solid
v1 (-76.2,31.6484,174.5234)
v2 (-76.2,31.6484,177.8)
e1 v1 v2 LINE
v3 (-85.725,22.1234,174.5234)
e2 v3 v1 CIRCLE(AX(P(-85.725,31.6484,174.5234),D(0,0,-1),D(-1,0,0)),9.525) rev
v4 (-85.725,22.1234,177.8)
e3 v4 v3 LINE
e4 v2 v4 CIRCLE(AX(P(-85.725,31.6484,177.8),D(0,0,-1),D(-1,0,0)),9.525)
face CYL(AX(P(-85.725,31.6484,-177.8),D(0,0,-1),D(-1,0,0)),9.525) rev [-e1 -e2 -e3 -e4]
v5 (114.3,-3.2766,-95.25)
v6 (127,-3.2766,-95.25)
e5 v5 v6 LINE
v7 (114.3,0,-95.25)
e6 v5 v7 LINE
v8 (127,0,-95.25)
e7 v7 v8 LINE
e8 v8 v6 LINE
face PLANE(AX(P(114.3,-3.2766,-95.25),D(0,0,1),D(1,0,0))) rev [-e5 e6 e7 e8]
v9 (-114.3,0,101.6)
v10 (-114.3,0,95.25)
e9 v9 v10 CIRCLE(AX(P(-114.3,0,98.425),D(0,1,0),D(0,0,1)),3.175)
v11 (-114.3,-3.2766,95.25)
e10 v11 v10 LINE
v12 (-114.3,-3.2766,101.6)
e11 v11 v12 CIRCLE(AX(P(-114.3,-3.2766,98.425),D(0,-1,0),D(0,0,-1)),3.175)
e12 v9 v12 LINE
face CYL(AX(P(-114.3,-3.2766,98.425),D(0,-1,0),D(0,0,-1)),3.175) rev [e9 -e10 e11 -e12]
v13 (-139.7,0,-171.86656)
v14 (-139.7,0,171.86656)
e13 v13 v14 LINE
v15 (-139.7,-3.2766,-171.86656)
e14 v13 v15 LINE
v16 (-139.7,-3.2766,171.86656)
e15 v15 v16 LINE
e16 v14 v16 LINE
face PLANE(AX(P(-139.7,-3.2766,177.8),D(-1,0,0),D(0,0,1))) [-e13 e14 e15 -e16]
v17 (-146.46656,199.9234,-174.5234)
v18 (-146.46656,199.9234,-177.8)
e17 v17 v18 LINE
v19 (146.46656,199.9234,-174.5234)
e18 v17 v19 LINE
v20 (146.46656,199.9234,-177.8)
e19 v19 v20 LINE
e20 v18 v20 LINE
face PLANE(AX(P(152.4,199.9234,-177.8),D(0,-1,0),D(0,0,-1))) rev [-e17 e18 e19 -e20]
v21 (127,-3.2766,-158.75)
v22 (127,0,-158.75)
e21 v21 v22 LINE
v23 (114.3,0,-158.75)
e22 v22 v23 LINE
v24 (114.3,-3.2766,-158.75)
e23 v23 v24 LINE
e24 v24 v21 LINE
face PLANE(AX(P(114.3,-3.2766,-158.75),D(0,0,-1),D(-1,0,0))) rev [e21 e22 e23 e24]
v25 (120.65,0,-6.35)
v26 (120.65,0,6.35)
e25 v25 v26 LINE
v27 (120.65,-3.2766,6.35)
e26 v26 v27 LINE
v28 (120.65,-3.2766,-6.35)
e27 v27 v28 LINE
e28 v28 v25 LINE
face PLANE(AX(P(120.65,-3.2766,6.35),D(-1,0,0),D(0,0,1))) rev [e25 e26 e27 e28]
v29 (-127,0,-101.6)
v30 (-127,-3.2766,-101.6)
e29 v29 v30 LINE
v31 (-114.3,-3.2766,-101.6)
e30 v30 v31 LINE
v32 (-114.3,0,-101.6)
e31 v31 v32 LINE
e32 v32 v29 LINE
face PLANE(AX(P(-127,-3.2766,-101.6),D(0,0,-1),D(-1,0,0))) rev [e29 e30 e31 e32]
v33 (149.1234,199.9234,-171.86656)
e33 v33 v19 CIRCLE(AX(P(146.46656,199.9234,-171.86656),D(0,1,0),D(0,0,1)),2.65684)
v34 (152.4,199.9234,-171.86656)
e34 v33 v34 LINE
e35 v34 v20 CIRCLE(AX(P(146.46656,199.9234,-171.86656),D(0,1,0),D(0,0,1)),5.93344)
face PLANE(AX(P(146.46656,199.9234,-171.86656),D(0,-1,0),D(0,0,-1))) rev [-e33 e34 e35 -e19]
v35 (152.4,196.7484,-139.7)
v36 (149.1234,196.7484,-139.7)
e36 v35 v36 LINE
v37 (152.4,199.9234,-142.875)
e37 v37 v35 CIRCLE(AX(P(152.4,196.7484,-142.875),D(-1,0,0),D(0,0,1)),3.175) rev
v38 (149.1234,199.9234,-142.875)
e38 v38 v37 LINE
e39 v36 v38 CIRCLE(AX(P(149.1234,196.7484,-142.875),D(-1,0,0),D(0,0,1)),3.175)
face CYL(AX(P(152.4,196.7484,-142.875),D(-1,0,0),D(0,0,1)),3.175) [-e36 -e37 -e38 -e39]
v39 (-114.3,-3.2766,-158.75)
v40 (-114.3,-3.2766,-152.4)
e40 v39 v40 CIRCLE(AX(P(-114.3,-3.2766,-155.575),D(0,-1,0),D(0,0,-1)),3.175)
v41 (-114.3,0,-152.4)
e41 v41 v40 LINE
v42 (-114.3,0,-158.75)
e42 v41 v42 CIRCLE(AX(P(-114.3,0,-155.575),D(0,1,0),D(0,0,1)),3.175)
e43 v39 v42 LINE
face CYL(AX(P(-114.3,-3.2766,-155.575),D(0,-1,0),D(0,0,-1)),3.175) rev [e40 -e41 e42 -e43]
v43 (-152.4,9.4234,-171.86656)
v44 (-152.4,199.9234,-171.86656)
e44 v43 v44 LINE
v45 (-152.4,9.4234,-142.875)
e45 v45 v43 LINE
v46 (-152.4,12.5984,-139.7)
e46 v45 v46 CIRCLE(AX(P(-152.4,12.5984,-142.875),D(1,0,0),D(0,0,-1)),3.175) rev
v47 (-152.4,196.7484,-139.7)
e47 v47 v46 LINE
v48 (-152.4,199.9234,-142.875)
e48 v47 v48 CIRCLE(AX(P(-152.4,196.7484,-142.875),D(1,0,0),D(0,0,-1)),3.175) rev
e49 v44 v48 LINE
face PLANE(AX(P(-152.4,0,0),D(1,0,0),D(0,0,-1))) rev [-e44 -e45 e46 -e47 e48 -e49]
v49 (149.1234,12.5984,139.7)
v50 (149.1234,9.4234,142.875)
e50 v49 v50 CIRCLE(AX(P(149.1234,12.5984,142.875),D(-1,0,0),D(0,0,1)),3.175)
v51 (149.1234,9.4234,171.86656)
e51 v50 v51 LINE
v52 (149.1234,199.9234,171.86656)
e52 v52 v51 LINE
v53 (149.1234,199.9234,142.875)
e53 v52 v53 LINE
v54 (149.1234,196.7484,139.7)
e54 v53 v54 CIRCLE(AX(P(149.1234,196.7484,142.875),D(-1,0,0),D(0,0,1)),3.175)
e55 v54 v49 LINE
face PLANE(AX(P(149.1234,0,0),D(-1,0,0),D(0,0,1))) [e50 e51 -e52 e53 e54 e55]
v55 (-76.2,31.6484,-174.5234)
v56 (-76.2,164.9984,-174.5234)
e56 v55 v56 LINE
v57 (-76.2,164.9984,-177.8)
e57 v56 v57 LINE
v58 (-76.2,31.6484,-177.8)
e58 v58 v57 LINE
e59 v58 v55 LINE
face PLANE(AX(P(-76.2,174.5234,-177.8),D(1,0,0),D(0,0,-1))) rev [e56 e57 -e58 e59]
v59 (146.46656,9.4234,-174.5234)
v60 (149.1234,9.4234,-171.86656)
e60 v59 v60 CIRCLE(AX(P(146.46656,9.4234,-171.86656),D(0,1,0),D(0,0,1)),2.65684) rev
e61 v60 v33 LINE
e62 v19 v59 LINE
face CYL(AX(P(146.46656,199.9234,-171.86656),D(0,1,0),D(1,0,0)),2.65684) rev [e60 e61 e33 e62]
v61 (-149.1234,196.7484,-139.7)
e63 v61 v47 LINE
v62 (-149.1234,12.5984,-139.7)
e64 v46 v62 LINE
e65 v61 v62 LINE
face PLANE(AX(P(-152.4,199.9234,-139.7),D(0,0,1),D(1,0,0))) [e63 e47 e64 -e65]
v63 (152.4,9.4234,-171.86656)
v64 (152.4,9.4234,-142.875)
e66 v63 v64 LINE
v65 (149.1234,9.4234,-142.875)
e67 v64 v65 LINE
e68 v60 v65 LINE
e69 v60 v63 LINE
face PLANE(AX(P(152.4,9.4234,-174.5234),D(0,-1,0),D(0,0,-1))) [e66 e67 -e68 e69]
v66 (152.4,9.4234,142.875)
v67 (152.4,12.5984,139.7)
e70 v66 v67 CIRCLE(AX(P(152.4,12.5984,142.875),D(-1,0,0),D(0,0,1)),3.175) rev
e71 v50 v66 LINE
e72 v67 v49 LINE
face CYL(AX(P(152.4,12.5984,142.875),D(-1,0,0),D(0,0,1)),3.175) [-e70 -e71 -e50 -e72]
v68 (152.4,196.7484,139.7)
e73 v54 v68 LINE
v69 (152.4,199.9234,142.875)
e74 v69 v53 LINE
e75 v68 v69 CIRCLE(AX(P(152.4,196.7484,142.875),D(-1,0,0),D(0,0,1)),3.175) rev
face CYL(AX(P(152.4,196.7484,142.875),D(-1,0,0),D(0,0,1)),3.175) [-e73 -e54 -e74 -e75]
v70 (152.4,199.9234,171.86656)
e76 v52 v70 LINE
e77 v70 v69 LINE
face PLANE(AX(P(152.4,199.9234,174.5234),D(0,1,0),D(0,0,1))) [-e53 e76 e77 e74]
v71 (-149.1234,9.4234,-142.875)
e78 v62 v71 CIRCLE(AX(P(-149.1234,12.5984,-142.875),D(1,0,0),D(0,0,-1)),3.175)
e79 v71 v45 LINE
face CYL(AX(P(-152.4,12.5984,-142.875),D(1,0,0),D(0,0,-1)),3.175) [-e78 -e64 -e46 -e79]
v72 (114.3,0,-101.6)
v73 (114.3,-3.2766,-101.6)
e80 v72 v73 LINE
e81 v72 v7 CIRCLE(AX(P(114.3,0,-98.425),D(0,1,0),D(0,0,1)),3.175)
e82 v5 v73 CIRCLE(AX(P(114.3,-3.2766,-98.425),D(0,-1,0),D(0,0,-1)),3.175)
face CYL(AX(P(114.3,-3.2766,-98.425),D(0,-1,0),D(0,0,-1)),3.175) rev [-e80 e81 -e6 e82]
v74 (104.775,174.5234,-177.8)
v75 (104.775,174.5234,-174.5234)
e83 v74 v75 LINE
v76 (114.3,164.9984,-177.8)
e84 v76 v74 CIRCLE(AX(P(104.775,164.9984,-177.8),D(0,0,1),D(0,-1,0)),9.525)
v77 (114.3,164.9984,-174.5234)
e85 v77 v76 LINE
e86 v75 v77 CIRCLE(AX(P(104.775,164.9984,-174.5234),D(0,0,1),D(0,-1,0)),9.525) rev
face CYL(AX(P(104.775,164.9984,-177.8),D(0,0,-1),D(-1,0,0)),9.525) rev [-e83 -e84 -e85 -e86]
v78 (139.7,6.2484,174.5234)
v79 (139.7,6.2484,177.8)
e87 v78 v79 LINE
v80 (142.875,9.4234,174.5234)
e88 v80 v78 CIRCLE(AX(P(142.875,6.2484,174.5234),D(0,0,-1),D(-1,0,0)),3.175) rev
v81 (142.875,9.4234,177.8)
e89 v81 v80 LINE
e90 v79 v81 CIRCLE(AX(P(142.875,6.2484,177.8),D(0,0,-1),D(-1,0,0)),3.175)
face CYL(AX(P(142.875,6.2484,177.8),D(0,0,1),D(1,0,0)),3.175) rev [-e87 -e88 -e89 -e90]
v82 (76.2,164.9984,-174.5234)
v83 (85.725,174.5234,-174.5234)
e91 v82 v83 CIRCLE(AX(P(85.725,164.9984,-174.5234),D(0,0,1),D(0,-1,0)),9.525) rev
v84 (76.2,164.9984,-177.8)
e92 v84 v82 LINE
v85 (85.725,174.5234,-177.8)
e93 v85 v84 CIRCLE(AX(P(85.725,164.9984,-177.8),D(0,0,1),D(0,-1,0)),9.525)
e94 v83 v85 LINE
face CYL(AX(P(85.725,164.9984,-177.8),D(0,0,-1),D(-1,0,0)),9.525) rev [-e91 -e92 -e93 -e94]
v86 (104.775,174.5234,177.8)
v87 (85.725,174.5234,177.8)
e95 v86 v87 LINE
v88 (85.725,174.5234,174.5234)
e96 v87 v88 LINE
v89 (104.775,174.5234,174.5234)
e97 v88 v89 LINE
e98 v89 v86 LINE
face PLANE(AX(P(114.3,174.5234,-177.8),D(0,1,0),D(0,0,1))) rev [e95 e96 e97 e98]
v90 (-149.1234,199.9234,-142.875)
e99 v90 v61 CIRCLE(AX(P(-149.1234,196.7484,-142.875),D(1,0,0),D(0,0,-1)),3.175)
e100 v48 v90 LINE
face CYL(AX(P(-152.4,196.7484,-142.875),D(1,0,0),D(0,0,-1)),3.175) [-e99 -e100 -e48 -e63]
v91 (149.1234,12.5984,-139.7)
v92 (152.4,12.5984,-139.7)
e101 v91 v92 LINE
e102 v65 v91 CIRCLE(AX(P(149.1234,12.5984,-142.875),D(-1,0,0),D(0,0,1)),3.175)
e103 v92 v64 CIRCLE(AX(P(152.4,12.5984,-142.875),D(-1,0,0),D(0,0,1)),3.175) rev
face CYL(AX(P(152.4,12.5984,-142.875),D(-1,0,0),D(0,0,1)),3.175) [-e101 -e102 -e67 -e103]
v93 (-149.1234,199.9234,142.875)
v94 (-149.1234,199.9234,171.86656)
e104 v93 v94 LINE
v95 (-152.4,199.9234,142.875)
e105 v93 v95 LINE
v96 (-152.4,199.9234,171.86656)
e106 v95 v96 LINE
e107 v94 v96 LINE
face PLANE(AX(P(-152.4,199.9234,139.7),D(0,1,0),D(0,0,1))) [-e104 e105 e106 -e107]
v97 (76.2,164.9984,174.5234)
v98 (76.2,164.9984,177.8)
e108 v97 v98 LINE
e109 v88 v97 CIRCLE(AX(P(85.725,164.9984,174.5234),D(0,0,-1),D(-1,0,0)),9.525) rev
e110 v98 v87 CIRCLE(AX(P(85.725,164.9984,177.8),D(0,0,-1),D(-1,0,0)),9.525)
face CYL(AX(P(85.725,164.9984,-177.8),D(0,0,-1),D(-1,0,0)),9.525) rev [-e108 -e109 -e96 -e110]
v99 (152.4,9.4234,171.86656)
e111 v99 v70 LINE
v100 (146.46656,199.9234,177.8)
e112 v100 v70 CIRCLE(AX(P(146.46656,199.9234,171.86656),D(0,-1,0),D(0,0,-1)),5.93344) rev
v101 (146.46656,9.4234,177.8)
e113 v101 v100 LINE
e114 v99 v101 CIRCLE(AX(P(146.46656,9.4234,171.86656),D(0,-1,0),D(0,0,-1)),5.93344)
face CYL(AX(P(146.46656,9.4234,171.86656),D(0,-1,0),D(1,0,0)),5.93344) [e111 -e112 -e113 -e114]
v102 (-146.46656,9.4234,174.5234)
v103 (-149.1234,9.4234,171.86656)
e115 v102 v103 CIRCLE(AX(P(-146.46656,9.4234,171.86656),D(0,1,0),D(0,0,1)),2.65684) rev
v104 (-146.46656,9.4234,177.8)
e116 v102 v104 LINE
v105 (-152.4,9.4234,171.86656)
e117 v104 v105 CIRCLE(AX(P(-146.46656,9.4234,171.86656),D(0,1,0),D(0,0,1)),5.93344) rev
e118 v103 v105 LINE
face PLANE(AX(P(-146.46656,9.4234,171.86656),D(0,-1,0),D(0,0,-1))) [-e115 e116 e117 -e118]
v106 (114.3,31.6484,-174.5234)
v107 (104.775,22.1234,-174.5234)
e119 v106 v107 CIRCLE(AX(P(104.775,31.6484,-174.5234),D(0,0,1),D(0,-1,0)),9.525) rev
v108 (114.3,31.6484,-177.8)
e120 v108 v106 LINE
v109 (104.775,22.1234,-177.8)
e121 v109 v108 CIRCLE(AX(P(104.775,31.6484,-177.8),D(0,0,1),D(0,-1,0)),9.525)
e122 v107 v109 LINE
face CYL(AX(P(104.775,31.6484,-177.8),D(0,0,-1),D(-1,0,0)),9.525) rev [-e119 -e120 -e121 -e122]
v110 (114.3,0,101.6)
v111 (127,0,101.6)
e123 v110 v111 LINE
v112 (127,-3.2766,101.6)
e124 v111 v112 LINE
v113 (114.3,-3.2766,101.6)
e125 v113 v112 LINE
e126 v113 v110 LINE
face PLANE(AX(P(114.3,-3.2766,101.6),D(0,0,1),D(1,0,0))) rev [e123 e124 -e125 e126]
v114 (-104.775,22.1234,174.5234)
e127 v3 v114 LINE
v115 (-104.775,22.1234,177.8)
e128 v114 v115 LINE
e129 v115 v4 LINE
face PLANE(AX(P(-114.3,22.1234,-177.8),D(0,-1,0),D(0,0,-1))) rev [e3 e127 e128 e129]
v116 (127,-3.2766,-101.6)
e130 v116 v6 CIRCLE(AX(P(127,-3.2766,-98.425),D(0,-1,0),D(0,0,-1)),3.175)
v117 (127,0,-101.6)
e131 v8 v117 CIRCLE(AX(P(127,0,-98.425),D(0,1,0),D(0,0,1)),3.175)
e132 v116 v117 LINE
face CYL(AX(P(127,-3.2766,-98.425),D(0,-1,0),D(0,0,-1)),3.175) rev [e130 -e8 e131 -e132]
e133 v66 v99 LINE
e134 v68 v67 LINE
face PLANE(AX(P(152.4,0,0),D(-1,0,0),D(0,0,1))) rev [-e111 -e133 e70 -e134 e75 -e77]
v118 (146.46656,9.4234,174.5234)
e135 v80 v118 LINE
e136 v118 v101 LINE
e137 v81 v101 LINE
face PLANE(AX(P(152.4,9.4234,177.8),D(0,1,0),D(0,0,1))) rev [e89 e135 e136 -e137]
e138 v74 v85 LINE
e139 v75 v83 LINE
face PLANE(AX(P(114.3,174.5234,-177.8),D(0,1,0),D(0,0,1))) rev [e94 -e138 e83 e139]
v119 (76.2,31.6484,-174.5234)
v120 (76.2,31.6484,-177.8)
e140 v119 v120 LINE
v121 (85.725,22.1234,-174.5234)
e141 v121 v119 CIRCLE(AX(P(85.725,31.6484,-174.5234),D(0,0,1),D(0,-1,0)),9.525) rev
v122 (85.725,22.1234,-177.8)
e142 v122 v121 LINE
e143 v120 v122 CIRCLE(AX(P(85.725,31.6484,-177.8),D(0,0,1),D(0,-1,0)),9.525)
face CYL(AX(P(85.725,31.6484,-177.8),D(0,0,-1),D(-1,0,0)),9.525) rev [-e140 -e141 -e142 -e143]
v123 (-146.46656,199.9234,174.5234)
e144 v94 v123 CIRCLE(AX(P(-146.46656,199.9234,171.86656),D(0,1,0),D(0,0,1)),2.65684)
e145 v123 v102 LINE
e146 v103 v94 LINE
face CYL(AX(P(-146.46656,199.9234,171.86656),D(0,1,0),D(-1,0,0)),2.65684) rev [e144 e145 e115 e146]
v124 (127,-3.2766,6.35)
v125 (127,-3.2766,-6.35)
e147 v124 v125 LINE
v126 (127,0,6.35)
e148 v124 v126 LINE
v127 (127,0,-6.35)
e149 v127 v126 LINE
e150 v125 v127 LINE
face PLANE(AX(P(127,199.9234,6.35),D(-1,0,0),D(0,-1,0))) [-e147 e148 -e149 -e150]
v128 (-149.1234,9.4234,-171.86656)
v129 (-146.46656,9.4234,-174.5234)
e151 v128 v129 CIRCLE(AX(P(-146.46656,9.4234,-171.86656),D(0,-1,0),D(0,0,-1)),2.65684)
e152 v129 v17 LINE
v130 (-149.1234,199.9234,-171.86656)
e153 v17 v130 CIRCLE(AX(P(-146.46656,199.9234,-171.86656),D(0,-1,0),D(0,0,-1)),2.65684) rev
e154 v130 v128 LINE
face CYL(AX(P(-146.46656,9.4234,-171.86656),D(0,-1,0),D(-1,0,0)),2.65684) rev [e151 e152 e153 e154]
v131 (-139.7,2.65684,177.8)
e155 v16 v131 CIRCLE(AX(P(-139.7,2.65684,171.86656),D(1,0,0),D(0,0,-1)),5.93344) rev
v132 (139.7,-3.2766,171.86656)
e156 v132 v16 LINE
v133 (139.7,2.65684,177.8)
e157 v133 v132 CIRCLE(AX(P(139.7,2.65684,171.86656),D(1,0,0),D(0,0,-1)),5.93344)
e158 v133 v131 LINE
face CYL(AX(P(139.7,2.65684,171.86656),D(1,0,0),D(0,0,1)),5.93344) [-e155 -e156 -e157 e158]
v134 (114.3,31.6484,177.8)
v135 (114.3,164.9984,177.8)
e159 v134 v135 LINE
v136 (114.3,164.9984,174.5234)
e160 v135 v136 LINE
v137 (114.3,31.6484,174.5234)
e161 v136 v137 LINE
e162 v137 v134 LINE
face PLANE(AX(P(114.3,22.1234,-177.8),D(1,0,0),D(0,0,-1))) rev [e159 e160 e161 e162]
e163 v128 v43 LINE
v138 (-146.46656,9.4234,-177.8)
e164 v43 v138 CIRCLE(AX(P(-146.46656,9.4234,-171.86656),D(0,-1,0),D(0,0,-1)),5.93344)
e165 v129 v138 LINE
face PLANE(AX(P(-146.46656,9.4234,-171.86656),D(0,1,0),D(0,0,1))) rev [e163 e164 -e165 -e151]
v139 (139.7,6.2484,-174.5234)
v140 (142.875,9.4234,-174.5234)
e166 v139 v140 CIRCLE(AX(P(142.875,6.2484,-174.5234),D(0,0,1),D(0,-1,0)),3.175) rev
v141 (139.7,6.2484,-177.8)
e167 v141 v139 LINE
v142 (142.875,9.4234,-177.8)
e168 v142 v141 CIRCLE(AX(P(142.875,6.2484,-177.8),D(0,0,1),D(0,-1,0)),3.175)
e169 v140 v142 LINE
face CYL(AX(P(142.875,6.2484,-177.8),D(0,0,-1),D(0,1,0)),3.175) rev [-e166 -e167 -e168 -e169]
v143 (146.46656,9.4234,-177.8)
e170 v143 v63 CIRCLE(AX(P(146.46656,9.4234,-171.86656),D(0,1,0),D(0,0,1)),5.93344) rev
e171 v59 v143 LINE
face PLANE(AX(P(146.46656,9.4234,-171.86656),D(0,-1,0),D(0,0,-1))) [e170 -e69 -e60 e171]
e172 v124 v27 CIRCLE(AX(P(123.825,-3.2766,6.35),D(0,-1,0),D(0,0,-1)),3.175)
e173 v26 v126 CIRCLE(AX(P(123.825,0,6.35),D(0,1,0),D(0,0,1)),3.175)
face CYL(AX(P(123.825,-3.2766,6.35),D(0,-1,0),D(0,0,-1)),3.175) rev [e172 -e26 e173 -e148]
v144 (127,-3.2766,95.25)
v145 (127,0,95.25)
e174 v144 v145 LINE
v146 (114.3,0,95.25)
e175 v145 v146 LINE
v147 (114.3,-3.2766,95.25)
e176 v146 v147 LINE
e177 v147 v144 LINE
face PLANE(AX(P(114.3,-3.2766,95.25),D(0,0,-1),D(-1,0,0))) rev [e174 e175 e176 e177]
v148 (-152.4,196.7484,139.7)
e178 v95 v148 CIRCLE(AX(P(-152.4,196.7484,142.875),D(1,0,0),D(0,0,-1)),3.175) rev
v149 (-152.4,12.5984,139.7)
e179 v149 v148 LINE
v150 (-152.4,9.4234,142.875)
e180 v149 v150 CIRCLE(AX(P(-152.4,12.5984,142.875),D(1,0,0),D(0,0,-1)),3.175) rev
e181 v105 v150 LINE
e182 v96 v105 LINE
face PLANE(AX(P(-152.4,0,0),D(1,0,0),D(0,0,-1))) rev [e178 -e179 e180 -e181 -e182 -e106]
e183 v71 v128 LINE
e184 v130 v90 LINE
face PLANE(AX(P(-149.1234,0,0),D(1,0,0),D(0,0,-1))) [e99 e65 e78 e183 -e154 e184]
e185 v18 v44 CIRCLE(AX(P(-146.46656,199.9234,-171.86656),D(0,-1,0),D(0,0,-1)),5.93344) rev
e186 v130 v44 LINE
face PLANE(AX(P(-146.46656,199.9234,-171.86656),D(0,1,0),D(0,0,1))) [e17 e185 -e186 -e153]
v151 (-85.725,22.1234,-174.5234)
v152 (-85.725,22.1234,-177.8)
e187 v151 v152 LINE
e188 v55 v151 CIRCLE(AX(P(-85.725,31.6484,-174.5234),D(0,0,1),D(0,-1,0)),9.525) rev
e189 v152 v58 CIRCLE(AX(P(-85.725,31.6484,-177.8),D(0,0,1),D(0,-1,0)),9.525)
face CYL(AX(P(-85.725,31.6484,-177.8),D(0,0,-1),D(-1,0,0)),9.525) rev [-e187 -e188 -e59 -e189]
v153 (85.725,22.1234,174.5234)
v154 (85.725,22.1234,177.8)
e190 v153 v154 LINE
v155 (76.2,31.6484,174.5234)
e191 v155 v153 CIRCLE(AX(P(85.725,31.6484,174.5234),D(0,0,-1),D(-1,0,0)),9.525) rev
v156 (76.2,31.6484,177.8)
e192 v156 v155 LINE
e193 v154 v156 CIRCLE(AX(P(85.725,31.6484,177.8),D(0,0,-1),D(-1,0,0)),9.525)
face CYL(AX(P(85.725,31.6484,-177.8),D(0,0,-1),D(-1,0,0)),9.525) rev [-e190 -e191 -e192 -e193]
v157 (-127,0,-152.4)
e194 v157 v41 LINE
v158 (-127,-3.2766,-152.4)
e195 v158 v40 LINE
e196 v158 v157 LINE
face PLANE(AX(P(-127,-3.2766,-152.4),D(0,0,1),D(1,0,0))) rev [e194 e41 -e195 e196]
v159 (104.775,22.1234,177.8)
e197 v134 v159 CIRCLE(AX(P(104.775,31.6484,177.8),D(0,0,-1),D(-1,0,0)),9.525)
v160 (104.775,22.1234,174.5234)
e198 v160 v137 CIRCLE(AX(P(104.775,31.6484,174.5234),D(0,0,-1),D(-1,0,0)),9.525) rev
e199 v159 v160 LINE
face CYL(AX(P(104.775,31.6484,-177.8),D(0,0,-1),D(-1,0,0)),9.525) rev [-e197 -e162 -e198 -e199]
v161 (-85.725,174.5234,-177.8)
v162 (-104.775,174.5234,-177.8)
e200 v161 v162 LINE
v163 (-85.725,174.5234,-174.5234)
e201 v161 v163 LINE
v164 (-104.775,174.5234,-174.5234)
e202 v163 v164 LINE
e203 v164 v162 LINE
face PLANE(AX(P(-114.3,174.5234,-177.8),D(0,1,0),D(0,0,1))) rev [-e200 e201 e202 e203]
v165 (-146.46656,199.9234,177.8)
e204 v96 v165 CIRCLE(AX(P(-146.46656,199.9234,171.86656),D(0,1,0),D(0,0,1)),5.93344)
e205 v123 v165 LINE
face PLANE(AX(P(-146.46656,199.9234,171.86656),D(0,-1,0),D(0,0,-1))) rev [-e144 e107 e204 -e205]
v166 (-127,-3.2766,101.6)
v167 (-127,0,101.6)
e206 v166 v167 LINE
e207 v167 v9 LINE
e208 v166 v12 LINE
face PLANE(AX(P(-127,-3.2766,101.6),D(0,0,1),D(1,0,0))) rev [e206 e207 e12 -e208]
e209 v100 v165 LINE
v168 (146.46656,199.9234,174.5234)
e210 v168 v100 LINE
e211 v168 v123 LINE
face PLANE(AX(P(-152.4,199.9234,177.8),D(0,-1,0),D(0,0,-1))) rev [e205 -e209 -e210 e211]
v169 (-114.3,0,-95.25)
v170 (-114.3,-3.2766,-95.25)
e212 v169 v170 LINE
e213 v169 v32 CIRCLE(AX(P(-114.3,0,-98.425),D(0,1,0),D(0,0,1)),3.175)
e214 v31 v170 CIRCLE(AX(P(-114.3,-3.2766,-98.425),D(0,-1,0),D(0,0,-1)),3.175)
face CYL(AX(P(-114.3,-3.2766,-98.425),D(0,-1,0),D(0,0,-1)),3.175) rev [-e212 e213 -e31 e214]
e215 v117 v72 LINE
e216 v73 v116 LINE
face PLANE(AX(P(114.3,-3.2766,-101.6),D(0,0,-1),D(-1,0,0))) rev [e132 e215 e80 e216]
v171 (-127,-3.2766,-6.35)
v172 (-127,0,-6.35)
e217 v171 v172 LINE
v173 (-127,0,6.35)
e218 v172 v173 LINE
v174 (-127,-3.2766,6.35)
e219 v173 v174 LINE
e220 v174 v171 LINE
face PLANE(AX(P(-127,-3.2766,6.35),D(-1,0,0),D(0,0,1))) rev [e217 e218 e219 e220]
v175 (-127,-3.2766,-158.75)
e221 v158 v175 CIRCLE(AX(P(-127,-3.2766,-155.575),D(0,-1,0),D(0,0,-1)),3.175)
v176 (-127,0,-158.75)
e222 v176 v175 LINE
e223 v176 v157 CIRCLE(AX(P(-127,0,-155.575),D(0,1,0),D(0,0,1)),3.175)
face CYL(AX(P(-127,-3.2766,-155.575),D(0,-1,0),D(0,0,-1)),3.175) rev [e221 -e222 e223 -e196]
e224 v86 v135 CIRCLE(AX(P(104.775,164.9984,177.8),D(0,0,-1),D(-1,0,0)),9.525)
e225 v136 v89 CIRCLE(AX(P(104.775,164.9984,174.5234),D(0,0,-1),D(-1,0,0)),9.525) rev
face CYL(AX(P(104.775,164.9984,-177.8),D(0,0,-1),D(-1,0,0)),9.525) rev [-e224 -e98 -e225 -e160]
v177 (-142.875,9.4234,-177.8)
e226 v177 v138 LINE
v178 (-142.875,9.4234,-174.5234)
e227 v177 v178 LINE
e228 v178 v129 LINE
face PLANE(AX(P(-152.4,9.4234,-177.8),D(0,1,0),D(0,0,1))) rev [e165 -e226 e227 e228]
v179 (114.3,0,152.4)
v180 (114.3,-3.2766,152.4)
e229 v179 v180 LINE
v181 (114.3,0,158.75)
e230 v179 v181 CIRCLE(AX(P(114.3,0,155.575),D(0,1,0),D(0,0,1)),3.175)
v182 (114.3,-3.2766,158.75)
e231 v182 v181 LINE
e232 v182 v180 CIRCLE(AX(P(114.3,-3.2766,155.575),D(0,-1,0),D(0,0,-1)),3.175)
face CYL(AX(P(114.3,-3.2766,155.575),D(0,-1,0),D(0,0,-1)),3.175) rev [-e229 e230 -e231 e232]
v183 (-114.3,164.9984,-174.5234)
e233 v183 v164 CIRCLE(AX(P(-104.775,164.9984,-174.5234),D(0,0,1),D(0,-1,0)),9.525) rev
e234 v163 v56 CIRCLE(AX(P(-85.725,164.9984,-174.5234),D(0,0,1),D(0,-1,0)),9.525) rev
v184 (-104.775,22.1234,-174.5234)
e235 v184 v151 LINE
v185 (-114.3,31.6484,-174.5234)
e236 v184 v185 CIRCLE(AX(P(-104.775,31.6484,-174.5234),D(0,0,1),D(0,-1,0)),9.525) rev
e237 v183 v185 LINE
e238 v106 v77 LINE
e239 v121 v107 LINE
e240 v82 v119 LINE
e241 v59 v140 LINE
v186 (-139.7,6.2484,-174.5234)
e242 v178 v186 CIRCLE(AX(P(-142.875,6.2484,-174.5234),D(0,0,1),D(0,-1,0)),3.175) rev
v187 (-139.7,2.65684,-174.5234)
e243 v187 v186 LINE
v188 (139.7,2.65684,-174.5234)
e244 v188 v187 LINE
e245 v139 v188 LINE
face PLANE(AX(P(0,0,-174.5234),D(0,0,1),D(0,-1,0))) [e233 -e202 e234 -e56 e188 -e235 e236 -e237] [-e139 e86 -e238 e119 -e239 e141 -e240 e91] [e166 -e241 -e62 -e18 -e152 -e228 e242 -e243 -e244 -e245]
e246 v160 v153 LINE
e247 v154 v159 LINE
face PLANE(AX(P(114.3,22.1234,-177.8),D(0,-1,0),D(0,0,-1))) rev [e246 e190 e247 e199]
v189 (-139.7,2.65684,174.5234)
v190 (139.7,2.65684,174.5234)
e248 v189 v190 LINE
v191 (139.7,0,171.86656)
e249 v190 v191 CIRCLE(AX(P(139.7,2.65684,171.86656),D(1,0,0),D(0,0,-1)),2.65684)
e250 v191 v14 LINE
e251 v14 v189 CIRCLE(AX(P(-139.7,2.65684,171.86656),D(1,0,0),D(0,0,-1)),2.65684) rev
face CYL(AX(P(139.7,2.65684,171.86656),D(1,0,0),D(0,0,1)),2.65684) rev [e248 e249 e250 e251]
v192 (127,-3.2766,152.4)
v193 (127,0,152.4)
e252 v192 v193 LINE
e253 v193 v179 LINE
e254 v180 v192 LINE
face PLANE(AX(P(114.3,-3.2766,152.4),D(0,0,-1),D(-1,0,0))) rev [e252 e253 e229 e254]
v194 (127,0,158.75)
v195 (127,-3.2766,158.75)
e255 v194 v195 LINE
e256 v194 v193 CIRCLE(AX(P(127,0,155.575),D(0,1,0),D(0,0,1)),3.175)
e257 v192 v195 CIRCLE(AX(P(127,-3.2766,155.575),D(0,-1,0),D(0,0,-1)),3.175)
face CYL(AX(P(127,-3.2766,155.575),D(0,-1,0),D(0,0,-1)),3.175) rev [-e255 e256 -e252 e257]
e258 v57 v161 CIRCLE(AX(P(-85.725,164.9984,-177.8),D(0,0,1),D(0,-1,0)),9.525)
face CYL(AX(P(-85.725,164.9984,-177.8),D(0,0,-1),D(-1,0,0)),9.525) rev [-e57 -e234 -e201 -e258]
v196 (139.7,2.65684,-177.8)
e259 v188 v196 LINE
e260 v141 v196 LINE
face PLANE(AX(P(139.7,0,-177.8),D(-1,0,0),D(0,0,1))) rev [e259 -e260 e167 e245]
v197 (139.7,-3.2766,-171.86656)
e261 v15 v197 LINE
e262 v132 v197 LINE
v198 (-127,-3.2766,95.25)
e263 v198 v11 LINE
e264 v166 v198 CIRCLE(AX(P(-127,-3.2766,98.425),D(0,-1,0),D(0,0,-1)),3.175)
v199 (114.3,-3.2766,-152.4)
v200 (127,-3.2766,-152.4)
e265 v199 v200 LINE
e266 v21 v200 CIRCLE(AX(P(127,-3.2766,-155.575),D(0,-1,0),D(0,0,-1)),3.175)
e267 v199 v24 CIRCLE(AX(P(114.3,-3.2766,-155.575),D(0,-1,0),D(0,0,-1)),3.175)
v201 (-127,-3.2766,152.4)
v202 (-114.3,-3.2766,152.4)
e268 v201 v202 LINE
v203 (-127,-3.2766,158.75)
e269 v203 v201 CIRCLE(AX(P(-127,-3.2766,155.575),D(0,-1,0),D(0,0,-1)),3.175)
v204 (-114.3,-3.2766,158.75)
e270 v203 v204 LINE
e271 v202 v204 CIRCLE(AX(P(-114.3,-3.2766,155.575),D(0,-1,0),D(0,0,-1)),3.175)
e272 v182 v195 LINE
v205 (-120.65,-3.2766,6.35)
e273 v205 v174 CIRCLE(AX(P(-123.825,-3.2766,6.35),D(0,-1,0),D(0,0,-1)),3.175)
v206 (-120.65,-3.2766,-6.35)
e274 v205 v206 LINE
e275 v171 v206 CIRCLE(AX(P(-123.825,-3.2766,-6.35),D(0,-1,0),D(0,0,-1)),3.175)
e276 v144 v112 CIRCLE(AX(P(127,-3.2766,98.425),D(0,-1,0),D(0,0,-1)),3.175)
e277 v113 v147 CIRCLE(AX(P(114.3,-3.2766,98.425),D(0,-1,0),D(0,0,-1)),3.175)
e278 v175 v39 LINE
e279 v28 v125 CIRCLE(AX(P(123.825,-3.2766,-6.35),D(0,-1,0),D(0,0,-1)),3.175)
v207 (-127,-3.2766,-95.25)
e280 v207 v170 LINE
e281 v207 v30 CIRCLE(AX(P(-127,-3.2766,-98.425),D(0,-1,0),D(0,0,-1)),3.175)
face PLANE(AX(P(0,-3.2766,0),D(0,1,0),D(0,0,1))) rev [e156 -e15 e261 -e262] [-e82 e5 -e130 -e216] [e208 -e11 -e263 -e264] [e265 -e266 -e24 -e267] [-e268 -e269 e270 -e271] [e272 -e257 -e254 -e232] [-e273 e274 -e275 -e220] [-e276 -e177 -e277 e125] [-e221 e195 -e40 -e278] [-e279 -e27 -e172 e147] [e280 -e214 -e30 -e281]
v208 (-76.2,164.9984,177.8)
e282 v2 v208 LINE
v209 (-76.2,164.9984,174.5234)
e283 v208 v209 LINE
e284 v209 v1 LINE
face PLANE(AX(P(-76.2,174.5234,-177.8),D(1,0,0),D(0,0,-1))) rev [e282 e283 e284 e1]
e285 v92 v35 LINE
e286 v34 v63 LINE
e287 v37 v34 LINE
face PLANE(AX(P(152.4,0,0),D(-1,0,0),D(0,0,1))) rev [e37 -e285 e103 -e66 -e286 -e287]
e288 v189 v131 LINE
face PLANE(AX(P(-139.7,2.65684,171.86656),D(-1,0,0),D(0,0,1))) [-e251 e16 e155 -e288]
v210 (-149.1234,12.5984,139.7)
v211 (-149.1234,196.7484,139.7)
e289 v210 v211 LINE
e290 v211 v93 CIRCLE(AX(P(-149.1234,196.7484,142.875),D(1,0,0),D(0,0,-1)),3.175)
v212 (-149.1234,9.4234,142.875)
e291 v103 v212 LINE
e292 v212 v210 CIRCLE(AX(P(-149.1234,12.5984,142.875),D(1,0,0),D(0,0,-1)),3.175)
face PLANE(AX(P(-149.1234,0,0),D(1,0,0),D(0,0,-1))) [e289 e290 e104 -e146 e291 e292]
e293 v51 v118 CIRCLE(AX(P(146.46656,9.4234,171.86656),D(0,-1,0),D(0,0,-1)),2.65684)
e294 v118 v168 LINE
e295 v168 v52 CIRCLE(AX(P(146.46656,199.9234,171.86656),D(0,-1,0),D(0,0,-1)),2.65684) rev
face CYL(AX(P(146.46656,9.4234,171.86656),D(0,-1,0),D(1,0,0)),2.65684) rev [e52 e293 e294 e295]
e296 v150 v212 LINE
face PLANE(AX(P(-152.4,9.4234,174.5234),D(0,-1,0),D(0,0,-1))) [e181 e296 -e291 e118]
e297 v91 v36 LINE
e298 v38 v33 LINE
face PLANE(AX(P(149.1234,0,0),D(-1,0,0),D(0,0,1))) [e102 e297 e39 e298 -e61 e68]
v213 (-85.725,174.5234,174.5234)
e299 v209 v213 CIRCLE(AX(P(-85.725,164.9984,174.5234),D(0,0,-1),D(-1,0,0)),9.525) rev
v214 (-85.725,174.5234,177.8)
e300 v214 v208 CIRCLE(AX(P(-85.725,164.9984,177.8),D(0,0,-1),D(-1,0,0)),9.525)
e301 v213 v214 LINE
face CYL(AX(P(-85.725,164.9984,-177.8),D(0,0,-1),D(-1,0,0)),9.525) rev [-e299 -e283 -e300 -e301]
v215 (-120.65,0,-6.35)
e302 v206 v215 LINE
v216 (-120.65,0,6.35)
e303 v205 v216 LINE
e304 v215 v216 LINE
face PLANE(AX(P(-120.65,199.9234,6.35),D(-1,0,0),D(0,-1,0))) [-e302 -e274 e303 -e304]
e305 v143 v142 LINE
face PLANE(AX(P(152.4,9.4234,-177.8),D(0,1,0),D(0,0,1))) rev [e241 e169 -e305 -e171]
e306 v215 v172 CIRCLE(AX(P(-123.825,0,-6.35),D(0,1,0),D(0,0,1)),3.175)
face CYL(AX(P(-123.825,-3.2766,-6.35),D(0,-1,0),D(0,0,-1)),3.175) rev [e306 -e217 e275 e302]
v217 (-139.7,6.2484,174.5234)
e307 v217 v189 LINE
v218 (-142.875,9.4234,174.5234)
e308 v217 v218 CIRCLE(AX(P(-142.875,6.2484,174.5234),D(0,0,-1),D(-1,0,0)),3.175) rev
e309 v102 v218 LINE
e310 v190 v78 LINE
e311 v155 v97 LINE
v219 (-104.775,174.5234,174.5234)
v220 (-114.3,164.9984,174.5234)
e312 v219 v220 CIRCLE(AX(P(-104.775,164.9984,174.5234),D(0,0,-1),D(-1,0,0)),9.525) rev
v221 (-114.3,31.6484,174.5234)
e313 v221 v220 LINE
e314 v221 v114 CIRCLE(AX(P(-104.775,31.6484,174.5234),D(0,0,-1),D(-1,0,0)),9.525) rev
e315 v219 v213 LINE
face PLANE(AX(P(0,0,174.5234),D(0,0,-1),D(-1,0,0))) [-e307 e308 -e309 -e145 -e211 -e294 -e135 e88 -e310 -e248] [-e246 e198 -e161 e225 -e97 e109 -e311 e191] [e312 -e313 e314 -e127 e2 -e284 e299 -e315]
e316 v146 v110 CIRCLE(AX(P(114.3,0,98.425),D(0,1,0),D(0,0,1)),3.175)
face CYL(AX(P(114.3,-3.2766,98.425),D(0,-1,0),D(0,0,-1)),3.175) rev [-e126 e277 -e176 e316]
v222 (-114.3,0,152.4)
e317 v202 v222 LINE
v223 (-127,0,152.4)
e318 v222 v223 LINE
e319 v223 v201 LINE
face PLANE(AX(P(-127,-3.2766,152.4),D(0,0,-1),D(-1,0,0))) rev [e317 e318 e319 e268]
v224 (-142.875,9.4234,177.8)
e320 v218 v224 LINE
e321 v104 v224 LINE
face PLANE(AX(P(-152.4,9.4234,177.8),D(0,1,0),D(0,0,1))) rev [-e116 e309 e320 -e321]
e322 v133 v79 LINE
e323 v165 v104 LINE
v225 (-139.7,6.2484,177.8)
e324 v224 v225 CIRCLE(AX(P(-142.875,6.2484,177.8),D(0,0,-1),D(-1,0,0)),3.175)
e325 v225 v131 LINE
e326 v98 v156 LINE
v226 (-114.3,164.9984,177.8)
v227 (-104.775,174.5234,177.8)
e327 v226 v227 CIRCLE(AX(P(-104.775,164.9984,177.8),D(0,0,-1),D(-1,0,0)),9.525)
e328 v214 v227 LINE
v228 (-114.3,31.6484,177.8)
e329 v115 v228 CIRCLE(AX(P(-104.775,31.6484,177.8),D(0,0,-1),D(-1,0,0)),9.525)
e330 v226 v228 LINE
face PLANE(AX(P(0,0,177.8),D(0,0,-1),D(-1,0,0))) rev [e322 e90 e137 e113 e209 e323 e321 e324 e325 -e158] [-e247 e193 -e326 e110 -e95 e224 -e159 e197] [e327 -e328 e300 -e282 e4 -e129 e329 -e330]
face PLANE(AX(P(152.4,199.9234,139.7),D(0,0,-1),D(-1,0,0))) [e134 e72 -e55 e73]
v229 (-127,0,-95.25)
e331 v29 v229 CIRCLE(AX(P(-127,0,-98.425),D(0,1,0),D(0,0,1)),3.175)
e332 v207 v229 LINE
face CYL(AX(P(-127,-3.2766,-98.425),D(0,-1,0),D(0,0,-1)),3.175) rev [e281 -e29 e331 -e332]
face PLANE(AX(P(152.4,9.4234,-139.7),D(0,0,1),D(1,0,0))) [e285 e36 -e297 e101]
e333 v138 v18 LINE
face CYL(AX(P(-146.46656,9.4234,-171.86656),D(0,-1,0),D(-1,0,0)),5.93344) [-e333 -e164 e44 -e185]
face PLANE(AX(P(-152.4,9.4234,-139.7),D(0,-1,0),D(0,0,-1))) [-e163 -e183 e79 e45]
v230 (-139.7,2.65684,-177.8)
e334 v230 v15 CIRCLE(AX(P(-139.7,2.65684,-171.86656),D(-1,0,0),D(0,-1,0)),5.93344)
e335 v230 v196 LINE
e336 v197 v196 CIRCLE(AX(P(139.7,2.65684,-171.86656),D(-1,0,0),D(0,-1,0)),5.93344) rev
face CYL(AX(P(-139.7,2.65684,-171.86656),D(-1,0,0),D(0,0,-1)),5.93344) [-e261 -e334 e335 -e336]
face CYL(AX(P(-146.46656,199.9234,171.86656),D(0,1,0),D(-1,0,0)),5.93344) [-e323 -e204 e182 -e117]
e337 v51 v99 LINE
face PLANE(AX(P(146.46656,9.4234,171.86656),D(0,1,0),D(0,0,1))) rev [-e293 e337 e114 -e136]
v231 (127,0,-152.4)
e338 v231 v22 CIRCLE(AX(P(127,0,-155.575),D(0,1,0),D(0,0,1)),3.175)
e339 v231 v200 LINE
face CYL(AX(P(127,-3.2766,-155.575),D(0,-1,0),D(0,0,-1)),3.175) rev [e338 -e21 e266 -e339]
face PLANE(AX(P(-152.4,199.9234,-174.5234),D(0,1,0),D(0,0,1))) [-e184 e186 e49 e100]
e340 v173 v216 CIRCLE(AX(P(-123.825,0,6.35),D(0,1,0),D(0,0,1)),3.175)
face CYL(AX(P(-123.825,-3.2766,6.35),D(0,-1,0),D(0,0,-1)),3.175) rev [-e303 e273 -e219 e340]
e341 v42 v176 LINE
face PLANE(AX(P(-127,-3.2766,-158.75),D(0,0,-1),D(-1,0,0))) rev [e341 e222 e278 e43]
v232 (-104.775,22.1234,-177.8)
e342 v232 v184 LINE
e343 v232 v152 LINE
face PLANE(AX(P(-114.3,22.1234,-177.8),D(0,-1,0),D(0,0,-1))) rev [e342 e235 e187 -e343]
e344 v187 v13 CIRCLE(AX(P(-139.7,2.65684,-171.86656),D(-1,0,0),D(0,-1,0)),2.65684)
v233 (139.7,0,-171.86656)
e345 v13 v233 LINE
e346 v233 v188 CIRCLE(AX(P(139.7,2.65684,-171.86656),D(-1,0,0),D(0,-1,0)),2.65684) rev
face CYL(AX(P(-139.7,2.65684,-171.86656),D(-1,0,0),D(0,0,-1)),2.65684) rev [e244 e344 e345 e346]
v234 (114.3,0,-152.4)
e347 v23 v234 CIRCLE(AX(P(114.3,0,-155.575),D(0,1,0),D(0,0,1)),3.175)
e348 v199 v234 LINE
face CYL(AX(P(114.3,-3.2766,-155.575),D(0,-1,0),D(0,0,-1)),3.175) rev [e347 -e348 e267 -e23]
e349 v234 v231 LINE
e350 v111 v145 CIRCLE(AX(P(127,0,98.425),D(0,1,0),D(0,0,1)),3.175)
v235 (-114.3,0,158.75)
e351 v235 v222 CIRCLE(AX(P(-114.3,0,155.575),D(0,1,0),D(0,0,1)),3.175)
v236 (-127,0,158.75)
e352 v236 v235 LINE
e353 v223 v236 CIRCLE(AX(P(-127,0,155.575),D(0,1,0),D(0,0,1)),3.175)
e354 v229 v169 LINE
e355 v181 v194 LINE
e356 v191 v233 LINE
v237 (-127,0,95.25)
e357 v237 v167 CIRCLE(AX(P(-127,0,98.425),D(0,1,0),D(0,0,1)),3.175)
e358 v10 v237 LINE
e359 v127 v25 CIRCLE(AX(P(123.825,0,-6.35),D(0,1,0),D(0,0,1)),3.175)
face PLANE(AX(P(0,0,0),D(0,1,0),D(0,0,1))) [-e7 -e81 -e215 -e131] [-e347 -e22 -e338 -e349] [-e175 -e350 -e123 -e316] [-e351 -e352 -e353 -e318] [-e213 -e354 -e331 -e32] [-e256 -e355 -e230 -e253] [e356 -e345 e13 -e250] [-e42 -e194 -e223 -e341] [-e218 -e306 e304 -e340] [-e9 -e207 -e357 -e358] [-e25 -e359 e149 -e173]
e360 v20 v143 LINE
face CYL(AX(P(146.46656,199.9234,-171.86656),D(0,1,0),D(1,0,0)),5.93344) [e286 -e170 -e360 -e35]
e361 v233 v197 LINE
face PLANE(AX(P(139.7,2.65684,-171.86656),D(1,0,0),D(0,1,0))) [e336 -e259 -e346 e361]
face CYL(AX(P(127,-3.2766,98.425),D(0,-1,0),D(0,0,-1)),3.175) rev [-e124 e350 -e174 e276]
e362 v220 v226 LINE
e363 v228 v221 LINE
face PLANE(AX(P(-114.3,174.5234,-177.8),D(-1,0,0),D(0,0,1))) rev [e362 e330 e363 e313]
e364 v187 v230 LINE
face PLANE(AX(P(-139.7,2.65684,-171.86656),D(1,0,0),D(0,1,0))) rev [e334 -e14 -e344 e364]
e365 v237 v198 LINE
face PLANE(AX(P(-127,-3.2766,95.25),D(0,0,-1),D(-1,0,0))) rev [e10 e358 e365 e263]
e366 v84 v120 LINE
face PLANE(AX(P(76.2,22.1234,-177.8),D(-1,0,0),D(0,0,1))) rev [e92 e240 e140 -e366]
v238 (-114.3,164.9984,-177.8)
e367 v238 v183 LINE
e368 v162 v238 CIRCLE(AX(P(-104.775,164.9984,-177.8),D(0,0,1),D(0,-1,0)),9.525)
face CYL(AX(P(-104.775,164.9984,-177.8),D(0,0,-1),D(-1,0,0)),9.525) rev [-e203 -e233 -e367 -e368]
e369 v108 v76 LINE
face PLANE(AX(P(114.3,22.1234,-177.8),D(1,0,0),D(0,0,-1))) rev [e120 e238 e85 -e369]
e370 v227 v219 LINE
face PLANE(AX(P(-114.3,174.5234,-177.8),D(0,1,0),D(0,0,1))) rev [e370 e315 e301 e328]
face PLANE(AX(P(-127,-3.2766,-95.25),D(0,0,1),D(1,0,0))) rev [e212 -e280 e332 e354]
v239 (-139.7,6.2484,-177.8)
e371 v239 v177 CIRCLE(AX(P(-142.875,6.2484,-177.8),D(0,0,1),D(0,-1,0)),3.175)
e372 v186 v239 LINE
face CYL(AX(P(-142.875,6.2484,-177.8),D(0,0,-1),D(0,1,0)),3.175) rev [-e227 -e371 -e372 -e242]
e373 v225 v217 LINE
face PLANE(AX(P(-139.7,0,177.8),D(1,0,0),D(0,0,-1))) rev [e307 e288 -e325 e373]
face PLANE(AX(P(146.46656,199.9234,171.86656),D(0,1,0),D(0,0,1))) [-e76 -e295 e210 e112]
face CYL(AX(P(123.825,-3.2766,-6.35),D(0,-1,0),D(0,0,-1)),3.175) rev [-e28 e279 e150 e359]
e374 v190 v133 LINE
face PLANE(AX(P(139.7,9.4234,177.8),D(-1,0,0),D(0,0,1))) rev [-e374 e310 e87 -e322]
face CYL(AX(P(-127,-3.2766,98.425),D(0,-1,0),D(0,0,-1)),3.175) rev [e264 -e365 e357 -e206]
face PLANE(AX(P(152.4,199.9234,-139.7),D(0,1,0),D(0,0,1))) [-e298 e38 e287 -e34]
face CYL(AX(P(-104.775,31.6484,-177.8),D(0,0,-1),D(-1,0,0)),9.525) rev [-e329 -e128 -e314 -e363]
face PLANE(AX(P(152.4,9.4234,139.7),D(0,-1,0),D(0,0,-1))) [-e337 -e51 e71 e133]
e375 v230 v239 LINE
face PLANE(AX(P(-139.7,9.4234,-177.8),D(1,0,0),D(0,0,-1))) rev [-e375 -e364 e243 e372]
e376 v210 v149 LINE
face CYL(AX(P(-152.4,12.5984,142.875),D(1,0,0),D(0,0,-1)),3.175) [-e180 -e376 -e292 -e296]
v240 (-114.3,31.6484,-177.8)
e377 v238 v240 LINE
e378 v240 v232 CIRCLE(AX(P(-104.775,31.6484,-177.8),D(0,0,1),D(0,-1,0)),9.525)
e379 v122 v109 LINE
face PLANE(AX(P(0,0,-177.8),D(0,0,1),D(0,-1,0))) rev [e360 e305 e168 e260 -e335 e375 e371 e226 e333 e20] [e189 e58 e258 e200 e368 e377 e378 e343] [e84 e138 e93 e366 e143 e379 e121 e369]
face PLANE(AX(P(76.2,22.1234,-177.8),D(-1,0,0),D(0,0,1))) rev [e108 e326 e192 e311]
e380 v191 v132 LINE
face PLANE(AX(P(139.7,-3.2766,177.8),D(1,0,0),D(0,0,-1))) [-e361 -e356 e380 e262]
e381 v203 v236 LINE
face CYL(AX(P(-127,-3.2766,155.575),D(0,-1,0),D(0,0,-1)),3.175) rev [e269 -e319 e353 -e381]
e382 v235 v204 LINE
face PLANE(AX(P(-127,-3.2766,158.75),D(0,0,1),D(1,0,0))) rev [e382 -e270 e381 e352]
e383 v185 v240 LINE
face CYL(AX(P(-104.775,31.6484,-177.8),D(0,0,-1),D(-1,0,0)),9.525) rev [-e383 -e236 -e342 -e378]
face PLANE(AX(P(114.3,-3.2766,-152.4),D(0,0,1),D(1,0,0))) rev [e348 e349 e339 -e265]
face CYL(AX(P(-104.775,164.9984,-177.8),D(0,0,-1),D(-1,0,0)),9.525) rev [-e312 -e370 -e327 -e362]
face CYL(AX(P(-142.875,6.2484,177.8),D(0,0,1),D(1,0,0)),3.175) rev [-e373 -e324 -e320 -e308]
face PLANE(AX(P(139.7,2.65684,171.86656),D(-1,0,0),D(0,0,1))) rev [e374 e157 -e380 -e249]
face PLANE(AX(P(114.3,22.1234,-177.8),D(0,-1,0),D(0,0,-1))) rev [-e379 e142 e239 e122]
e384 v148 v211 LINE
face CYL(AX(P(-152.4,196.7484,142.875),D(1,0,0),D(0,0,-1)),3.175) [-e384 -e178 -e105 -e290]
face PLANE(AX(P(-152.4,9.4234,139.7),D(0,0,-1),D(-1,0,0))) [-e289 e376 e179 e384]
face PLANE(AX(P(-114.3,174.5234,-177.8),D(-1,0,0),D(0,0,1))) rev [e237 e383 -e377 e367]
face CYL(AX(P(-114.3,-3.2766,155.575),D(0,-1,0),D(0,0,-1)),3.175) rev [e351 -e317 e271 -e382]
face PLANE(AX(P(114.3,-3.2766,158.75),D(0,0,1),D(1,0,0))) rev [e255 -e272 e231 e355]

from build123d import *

# Parameters (mm, degrees)
SKETCH1_W                       = 279.4
SKETCH1_H                       = 355.6
BASE_FLANGE1_DEPTH              = 3.2766
EDGE_FLANGE1_STRIP_W            = 18.42008
EDGE_FLANGE1_STRIP_H            = 3.2766
EDGE_FLANGE1_STRIP_CUT_DEPTH    = 279.4
EDGE_FLANGE1_STRIP_2_W          = 18.42008
EDGE_FLANGE1_STRIP_2_H          = 3.2766
EDGE_FLANGE1_STRIP_CUT_2_DEPTH  = 279.4
EDGE_FLANGE1_DEPTH              = 279.4
EDGE_FLANGE1_FLAT_DEPTH         = 3.2766
EDGE_FLANGE1_BEND_DEPTH         = 279.4
EDGE_FLANGE1_FLAT_2_DEPTH       = 3.2766
EDGE_FLANGE2_STRIP_W            = 18.42008
EDGE_FLANGE2_STRIP_H            = 3.2766
EDGE_FLANGE2_STRIP_CUT_DEPTH    = 190.5
EDGE_FLANGE2_STRIP_2_W          = 18.42008
EDGE_FLANGE2_STRIP_2_H          = 3.2766
EDGE_FLANGE2_STRIP_CUT_2_DEPTH  = 190.5
EDGE_FLANGE2_STRIP_3_W          = 18.42008
EDGE_FLANGE2_STRIP_3_H          = 3.2766
EDGE_FLANGE2_STRIP_CUT_3_DEPTH  = 190.5
EDGE_FLANGE2_STRIP_4_W          = 18.42008
EDGE_FLANGE2_STRIP_4_H          = 3.2766
EDGE_FLANGE2_STRIP_CUT_4_DEPTH  = 190.5
EDGE_FLANGE2_DEPTH              = 190.5
EDGE_FLANGE2_BEND_DEPTH         = 190.5
EDGE_FLANGE2_BEND_2_DEPTH       = 190.5
EDGE_FLANGE2_BEND_3_DEPTH       = 190.5
SKETCH34_W                      = 38.1
SKETCH34_H                      = 152.4
CUT_EXTRUDE1_DEPTH              = 436.484197035
FILLET1_R                       = 9.525
FILLET2_R                       = 3.175
F_1_4_START                     = -3.2766
F_1_4_0_25_DIAMETER_SLOT1_DEPTH = 3.2766
LPATTERN1_COUNT                 = 2
LPATTERN1_PITCH                 = 57.15
MIRROR1_START                   = -3.2766
MIRROR1_COPY_1_DEPTH            = 3.2766
F_1_4_0_25_DIAMETER_SLOT2_DEPTH = 3.2766


# Read off the part's stored shape, not the designer's step: 1/4 (0.25) Diameter Slot1, 1/4 (0.25) Diameter Slot2
# Sheet-metal steps are written as plain solids
with BuildPart() as part:
    # Sketch1 → Base-Flange1 (new body)
    with BuildSketch(Plane(origin=(0, 0, 0), x_dir=(1, 0, 0), z_dir=(0, 1, 0))):
        Rectangle(SKETCH1_W, SKETCH1_H)
    extrude(amount=-BASE_FLANGE1_DEPTH)

    # Edge-Flange1 strip (across the edge) → Edge-Flange1 strip cut (cut)
    with BuildSketch(Plane(origin=(-139.7, 0, 177.8), x_dir=(0, 0, -1), z_dir=(1, 0, 0))):
        with Locations((-3.2766, -1.6383)):
            Rectangle(EDGE_FLANGE1_STRIP_W, EDGE_FLANGE1_STRIP_H)
    extrude(amount=EDGE_FLANGE1_STRIP_CUT_DEPTH, mode=Mode.SUBTRACT)

    # Edge-Flange1 strip 2 (across the edge) → Edge-Flange1 strip cut 2 (cut)
    with BuildSketch(Plane(origin=(139.7, 0, -177.8), x_dir=(0, 0, 1), z_dir=(-1, 0, 0))):
        with Locations((-3.2766, -1.6383)):
            Rectangle(EDGE_FLANGE1_STRIP_2_W, EDGE_FLANGE1_STRIP_2_H)
    extrude(amount=EDGE_FLANGE1_STRIP_CUT_2_DEPTH, mode=Mode.SUBTRACT)

    # Edge-Flange1 bend section (across the edge) → Edge-Flange1 (add)
    with BuildSketch(Plane(origin=(-139.7, 0, 177.8), x_dir=(0, 0, -1), z_dir=(1, 0, 0))):
        with BuildLine():
            Line((0, 2.65684), (3.2766, 2.65684))
            ThreePointArc((3.2766, 2.65684), (4.054770419, 0.778170419), (5.93344, 0))
            Line((5.93344, 0), (5.93344, -3.2766))
            ThreePointArc((5.93344, -3.2766), (1.73786434, -1.53873566), (0, 2.65684))
        make_face()
    extrude(amount=EDGE_FLANGE1_DEPTH)

    # Edge-Flange1 profile (on flange) → Edge-Flange1 flat (add)
    with BuildSketch(Plane.XY.offset(177.8)):
        Polygon((-139.7, 2.65684), (139.7, 2.65684), (139.7, 9.4234), (152.4, 9.4234), (152.4, 199.9234), (-152.4, 199.9234), (-152.4, 9.4234), (-139.7, 9.4234), align=None)
    extrude(amount=-EDGE_FLANGE1_FLAT_DEPTH)

    # Edge-Flange1 bend section 2 (across the edge) → Edge-Flange1 bend (add)
    with BuildSketch(Plane(origin=(139.7, 0, -177.8), x_dir=(0, 0, 1), z_dir=(-1, 0, 0))):
        with BuildLine():
            Line((0, 2.65684), (3.2766, 2.65684))
            ThreePointArc((3.2766, 2.65684), (4.054770419, 0.778170419), (5.93344, 0))
            Line((5.93344, 0), (5.93344, -3.2766))
            ThreePointArc((5.93344, -3.2766), (1.73786434, -1.53873566), (0, 2.65684))
        make_face()
    extrude(amount=EDGE_FLANGE1_BEND_DEPTH)

    # Edge-Flange1 profile 2 (on flange) → Edge-Flange1 flat 2 (add)
    with BuildSketch(Plane(origin=(0, 0, -177.8), x_dir=(-1, 0, 0), z_dir=(0, 0, -1))):
        Polygon((-139.7, 9.4234), (-139.7, 2.65684), (139.7, 2.65684), (139.7, 9.4234), (152.4, 9.4234), (152.4, 199.9234), (-152.4, 199.9234), (-152.4, 9.4234), align=None)
    extrude(amount=-EDGE_FLANGE1_FLAT_2_DEPTH)

    # Edge-Flange2 strip (across the edge) → Edge-Flange2 strip cut (cut)
    with BuildSketch(Plane(origin=(-152.4, 9.4234, 174.5234), x_dir=(1, 0, 0), z_dir=(0, 1, 0))):
        with Locations((-3.2766, -1.6383)):
            Rectangle(EDGE_FLANGE2_STRIP_W, EDGE_FLANGE2_STRIP_H)
    extrude(amount=EDGE_FLANGE2_STRIP_CUT_DEPTH, mode=Mode.SUBTRACT)

    # Edge-Flange2 strip 2 (across the edge) → Edge-Flange2 strip cut 2 (cut)
    with BuildSketch(Plane(origin=(152.4, 199.9234, 174.5234), x_dir=(-1, 0, 0), z_dir=(0, -1, 0))):
        with Locations((-3.2766, -1.6383)):
            Rectangle(EDGE_FLANGE2_STRIP_2_W, EDGE_FLANGE2_STRIP_2_H)
    extrude(amount=EDGE_FLANGE2_STRIP_CUT_2_DEPTH, mode=Mode.SUBTRACT)

    # Edge-Flange2 strip 3 (across the edge) → Edge-Flange2 strip cut 3 (cut)
    with BuildSketch(Plane(origin=(-152.4, 199.9234, -174.5234), x_dir=(1, 0, 0), z_dir=(0, -1, 0))):
        with Locations((-3.2766, -1.6383)):
            Rectangle(EDGE_FLANGE2_STRIP_3_W, EDGE_FLANGE2_STRIP_3_H)
    extrude(amount=EDGE_FLANGE2_STRIP_CUT_3_DEPTH, mode=Mode.SUBTRACT)

    # Edge-Flange2 strip 4 (across the edge) → Edge-Flange2 strip cut 4 (cut)
    with BuildSketch(Plane(origin=(152.4, 9.4234, -174.5234), x_dir=(-1, 0, 0), z_dir=(0, 1, 0))):
        with Locations((-3.2766, -1.6383)):
            Rectangle(EDGE_FLANGE2_STRIP_4_W, EDGE_FLANGE2_STRIP_4_H)
    extrude(amount=EDGE_FLANGE2_STRIP_CUT_4_DEPTH, mode=Mode.SUBTRACT)

    # Edge-Flange2 section (across the edge) → Edge-Flange2 (add)
    with BuildSketch(Plane(origin=(-152.4, 9.4234, 174.5234), x_dir=(1, 0, 0), z_dir=(0, 1, 0))):
        with BuildLine():
            Line((0, 2.65684), (0, 34.8234))
            Line((0, 34.8234), (3.2766, 34.8234))
            Line((3.2766, 34.8234), (3.2766, 2.65684))
            ThreePointArc((3.2766, 2.65684), (4.054770419, 0.778170419), (5.93344, 0))
            Line((5.93344, 0), (5.93344, -3.2766))
            ThreePointArc((5.93344, -3.2766), (1.73786434, -1.53873566), (0, 2.65684))
        make_face()
    extrude(amount=EDGE_FLANGE2_DEPTH)

    # Edge-Flange2 section 2 (across the edge) → Edge-Flange2 bend (add)
    with BuildSketch(Plane(origin=(152.4, 199.9234, 174.5234), x_dir=(-1, 0, 0), z_dir=(0, -1, 0))):
        with BuildLine():
            Line((0, 2.65684), (0, 34.8234))
            Line((0, 34.8234), (3.2766, 34.8234))
            Line((3.2766, 34.8234), (3.2766, 2.65684))
            ThreePointArc((3.2766, 2.65684), (4.054770419, 0.778170419), (5.93344, 0))
            Line((5.93344, 0), (5.93344, -3.2766))
            ThreePointArc((5.93344, -3.2766), (1.73786434, -1.53873566), (0, 2.65684))
        make_face()
    extrude(amount=EDGE_FLANGE2_BEND_DEPTH)

    # Edge-Flange2 section 3 (across the edge) → Edge-Flange2 bend 2 (add)
    with BuildSketch(Plane(origin=(-152.4, 199.9234, -174.5234), x_dir=(1, 0, 0), z_dir=(0, -1, 0))):
        with BuildLine():
            Line((0, 2.65684), (0, 34.8234))
            Line((0, 34.8234), (3.2766, 34.8234))
            Line((3.2766, 34.8234), (3.2766, 2.65684))
            ThreePointArc((3.2766, 2.65684), (4.054770419, 0.778170419), (5.93344, 0))
            Line((5.93344, 0), (5.93344, -3.2766))
            ThreePointArc((5.93344, -3.2766), (1.73786434, -1.53873566), (0, 2.65684))
        make_face()
    extrude(amount=EDGE_FLANGE2_BEND_2_DEPTH)

    # Edge-Flange2 section 4 (across the edge) → Edge-Flange2 bend 3 (add)
    with BuildSketch(Plane(origin=(152.4, 9.4234, -174.5234), x_dir=(-1, 0, 0), z_dir=(0, 1, 0))):
        with BuildLine():
            Line((0, 2.65684), (0, 34.8234))
            Line((0, 34.8234), (3.2766, 34.8234))
            Line((3.2766, 34.8234), (3.2766, 2.65684))
            ThreePointArc((3.2766, 2.65684), (4.054770419, 0.778170419), (5.93344, 0))
            Line((5.93344, 0), (5.93344, -3.2766))
            ThreePointArc((5.93344, -3.2766), (1.73786434, -1.53873566), (0, 2.65684))
        make_face()
    extrude(amount=EDGE_FLANGE2_BEND_3_DEPTH)

    # Sketch34 → Cut-Extrude1 (cut, through all)
    with BuildSketch(Plane.XY.offset(177.8)):
        with Locations((-95.25, 98.3234)):
            Rectangle(SKETCH34_W, SKETCH34_H)
        with Locations((95.25, 98.3234)):
            Rectangle(SKETCH34_W, SKETCH34_H)
    extrude(amount=-CUT_EXTRUDE1_DEPTH, mode=Mode.SUBTRACT)

    # Fillet1
    fillet1_edges = [part.edges().sort_by_distance(p)[0] for p in [
        (-76.2, 174.5234, -176.1617),
        (-76.2, 22.1234, -176.1617),
        (-114.3, 22.1234, -176.1617),
        (-114.3, 174.5234, -176.1617),
        (-76.2, 174.5234, 176.1617),
        (-76.2, 22.1234, 176.1617),
        (-114.3, 22.1234, 176.1617),
        (-114.3, 174.5234, 176.1617),
        (76.2, 22.1234, -176.1617),
        (76.2, 174.5234, -176.1617),
        (114.3, 174.5234, -176.1617),
        (114.3, 22.1234, -176.1617),
        (76.2, 22.1234, 176.1617),
        (76.2, 174.5234, 176.1617),
        (114.3, 174.5234, 176.1617),
        (114.3, 22.1234, 176.1617),
    ]]
    fillet(fillet1_edges, radius=FILLET1_R)

    # Fillet2
    fillet2_edges = [part.edges().sort_by_distance(p)[0] for p in [
        (-150.7617, 9.4234, 139.7),
        (-150.7617, 199.9234, 139.7),
        (150.7617, 199.9234, 139.7),
        (150.7617, 9.4234, 139.7),
        (-150.7617, 199.9234, -139.7),
        (-150.7617, 9.4234, -139.7),
        (150.7617, 9.4234, -139.7),
        (150.7617, 199.9234, -139.7),
        (-139.7, 9.4234, 176.1617),
        (139.7, 9.4234, 176.1617),
        (139.7, 9.4234, -176.1617),
        (-139.7, 9.4234, -176.1617),
    ]]
    fillet(fillet2_edges, radius=FILLET2_R)

    # 1/4 (0.25) Diameter Slot1 outline → 1/4 (0.25) Diameter Slot1 (cut)
    with BuildSketch(Plane(origin=(0, 0, 0), x_dir=(1, 0, 0), z_dir=(0, 1, 0)).offset(F_1_4_START)):
        with BuildLine():
            ThreePointArc((-114.3, 152.4), (-111.125, 155.575), (-114.3, 158.75))
            Line((-114.3, 158.75), (-127, 158.75))
            ThreePointArc((-127, 158.75), (-130.175, 155.575), (-127, 152.4))
            Line((-127, 152.4), (-114.3, 152.4))
        make_face()
        with BuildLine():
            ThreePointArc((114.3, 158.75), (111.125, 155.575), (114.3, 152.4))
            Line((114.3, 152.4), (127, 152.4))
            ThreePointArc((127, 152.4), (130.175, 155.575), (127, 158.75))
            Line((127, 158.75), (114.3, 158.75))
        make_face()
    f_1_4_0_25_diameter_slot1 = extrude(amount=F_1_4_0_25_DIAMETER_SLOT1_DEPTH, mode=Mode.SUBTRACT)

    # LPattern1: 1/4 (0.25) Diameter Slot1 ×2
    with Locations(*[(0, 0, i * LPATTERN1_PITCH) for i in range(1, LPATTERN1_COUNT)]):
        add(f_1_4_0_25_diameter_slot1, mode=Mode.SUBTRACT)

    # Mirror1: 1/4 (0.25) Diameter Slot1 across plane
    add(f_1_4_0_25_diameter_slot1.mirror(Plane.XY), mode=Mode.SUBTRACT)

    # Mirror1 copy 1 sketch → Mirror1 copy 1 (cut)
    with BuildSketch(Plane(origin=(0, 0, -57.15), x_dir=(1, 0, 0), z_dir=(0, 1, 0)).offset(MIRROR1_START)):
        with BuildLine():
            ThreePointArc((-114.3, -152.4), (-111.125, -155.575), (-114.3, -158.75))
            Line((-114.3, -158.75), (-127, -158.75))
            ThreePointArc((-127, -158.75), (-130.175, -155.575), (-127, -152.4))
            Line((-127, -152.4), (-114.3, -152.4))
        make_face()
        with BuildLine():
            ThreePointArc((114.3, -158.75), (111.125, -155.575), (114.3, -152.4))
            Line((114.3, -152.4), (127, -152.4))
            ThreePointArc((127, -152.4), (130.175, -155.575), (127, -158.75))
            Line((127, -158.75), (114.3, -158.75))
        make_face()
    extrude(amount=MIRROR1_COPY_1_DEPTH, mode=Mode.SUBTRACT)

    # 1/4 (0.25) Diameter Slot2 outline → 1/4 (0.25) Diameter Slot2 (cut)
    with BuildSketch(Plane(origin=(0, 0, 0), x_dir=(1, 0, 0), z_dir=(0, 1, 0)).offset(F_1_4_START)):
        with BuildLine():
            ThreePointArc((-120.65, 6.35), (-123.825, 9.525), (-127, 6.35))
            Line((-127, 6.35), (-127, -6.35))
            ThreePointArc((-127, -6.35), (-123.825, -9.525), (-120.65, -6.35))
            Line((-120.65, -6.35), (-120.65, 6.35))
        make_face()
        with BuildLine():
            ThreePointArc((127, 6.35), (123.825, 9.525), (120.65, 6.35))
            Line((120.65, 6.35), (120.65, -6.35))
            ThreePointArc((120.65, -6.35), (123.825, -9.525), (127, -6.35))
            Line((127, -6.35), (127, 6.35))
        make_face()
    extrude(amount=F_1_4_0_25_DIAMETER_SLOT2_DEPTH, mode=Mode.SUBTRACT)


solid = part.part
